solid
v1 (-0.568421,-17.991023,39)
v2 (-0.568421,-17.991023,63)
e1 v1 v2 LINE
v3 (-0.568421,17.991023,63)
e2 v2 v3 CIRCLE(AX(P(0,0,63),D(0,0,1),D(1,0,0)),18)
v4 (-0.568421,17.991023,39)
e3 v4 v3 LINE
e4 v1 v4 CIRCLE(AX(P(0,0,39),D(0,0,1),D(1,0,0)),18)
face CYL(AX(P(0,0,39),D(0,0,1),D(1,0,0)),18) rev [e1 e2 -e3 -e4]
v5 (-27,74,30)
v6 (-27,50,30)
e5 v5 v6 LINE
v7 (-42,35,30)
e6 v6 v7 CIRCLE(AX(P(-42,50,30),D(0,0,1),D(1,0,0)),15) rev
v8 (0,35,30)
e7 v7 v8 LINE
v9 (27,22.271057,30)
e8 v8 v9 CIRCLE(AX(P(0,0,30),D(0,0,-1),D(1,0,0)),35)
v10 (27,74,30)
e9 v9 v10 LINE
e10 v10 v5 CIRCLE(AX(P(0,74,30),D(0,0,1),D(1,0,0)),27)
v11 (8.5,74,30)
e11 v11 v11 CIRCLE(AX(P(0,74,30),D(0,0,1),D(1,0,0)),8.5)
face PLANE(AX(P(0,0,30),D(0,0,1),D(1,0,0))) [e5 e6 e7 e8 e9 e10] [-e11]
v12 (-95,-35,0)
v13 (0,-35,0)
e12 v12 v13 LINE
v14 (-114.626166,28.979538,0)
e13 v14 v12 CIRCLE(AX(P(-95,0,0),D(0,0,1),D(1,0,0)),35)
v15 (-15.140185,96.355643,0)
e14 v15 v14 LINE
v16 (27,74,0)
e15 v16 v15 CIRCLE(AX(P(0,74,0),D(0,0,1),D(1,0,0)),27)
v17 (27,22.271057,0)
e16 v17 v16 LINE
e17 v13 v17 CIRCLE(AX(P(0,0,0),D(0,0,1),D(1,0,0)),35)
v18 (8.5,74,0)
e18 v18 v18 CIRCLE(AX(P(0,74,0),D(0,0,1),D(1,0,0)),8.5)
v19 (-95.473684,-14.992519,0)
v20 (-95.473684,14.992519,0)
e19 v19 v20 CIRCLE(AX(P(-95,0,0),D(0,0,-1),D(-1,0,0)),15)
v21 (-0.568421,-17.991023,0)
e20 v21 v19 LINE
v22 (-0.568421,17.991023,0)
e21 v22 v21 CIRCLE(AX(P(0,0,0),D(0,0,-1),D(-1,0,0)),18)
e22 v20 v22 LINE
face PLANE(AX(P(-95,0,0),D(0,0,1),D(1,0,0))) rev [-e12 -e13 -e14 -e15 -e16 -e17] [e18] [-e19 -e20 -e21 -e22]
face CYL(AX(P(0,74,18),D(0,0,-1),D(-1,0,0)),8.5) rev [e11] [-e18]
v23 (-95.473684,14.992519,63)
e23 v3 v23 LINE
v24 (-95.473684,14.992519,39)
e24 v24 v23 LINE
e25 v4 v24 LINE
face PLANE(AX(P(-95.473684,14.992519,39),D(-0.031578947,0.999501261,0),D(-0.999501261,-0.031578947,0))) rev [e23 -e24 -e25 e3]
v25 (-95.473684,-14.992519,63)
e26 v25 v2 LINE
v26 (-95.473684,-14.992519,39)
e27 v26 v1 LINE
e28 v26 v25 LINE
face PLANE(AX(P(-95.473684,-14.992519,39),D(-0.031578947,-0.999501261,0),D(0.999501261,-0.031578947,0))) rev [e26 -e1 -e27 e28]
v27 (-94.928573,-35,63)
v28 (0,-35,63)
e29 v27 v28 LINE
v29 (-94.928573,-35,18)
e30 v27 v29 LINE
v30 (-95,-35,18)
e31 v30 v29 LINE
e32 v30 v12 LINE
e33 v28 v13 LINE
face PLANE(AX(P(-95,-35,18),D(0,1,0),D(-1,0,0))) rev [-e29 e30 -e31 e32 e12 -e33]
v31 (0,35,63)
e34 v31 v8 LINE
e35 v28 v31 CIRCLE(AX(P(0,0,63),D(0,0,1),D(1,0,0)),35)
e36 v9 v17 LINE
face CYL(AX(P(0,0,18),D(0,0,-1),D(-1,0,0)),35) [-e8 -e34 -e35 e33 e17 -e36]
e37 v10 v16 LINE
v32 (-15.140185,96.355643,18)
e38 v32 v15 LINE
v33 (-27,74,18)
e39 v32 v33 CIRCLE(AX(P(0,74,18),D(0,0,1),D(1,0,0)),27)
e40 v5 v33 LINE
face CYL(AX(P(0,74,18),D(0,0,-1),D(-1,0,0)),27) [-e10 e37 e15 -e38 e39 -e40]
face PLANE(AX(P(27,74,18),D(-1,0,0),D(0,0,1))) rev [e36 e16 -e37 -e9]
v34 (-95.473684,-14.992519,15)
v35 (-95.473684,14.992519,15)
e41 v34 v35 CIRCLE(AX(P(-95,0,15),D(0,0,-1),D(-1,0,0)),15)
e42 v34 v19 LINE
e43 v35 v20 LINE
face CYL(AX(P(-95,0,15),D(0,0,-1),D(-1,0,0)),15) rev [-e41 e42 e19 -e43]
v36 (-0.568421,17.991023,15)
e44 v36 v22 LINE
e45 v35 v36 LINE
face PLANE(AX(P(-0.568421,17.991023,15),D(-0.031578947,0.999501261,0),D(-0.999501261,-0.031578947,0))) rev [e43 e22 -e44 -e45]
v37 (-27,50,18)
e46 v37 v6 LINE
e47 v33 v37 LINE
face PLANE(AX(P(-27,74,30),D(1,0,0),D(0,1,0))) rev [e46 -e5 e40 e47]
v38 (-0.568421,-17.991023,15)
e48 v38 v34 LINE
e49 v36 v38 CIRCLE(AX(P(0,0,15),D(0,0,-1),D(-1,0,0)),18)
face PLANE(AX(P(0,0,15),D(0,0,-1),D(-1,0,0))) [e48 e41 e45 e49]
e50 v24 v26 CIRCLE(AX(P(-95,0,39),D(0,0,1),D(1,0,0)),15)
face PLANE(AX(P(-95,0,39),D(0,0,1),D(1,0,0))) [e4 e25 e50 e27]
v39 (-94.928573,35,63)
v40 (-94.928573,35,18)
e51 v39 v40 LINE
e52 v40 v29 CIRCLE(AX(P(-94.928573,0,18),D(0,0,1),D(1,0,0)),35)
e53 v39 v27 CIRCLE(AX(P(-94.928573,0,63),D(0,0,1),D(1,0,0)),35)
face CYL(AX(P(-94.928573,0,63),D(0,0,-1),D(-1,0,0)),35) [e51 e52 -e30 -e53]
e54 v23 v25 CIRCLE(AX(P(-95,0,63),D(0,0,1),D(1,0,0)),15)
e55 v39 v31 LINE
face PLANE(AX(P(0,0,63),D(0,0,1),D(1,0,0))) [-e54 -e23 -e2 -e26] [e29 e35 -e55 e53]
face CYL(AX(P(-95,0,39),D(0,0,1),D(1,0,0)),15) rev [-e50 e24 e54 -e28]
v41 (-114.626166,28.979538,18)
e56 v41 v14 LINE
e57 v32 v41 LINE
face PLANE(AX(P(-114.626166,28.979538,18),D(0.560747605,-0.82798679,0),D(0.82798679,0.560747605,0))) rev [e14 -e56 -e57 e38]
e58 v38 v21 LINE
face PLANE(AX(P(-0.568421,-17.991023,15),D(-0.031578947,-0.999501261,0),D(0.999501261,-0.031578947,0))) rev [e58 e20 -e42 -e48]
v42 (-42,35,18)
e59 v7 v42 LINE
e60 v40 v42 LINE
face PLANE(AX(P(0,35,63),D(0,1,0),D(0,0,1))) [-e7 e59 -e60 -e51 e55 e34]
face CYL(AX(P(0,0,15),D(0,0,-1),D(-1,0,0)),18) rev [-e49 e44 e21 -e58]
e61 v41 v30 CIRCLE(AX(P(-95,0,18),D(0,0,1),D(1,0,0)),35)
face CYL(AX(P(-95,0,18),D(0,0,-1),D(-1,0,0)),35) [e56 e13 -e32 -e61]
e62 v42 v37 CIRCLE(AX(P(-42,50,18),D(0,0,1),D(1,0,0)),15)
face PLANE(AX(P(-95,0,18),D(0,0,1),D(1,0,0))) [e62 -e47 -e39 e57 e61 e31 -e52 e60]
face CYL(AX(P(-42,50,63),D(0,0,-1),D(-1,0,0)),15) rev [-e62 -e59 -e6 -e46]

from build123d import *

# Parameters (mm, degrees)
SKETCH1_R           = 8.5
BASE_DEPTH          = 18
BACK_CUT_DEPTH      = 15
BOSS_EXTRUDE2_DEPTH = 45
SKETCH5_R           = 8.5
BOSS_EXTRUDE4_DEPTH = 12
FILLET1_R           = 15
CUT_EXTRUDE2_START  = -24
CUT_EXTRUDE2_DEPTH  = 24


# Read off the part's stored shape, not the designer's step: Boss-Extrude2
with BuildPart() as part:
    # Sketch1 → base (new body)
    with BuildSketch(Plane.XY):
        with BuildLine():
            Line((-95, -35), (0, -35))
            ThreePointArc((0, -35), (31.658229663, -14.925029132), (27, 22.271057451))
            Line((27, 22.271057451), (27, 74))
            ThreePointArc((27, 74), (12.653359163, 97.8514675), (-15.140185324, 96.355643322))
            Line((-15.140185324, 96.355643322), (-114.626166161, 28.97953764))
            ThreePointArc((-114.626166161, 28.97953764), (-128.461050621, -10.26440896), (-95, -35))
        make_face()
        with Locations((0, 74)):
            Circle(SKETCH1_R, mode=Mode.SUBTRACT)
    extrude(amount=BASE_DEPTH)

    # Sketch3 → back cut (cut)
    with BuildSketch(Plane(origin=(0, 0, 0), x_dir=(-1, 0, 0), z_dir=(0, 0, -1))):
        with BuildLine():
            Line((0.568421053, 17.991022692), (95.473684211, 14.99251891))
            ThreePointArc((95.473684211, 14.99251891), (110, 0), (95.473684211, -14.99251891))
            Line((95.473684211, -14.99251891), (0.568421053, -17.991022692))
            ThreePointArc((0.568421053, -17.991022692), (-18, 0), (0.568421053, 17.991022692))
        make_face()
    extrude(amount=-BACK_CUT_DEPTH, mode=Mode.SUBTRACT)

    # Boss-Extrude2 outline → Boss-Extrude2 (add)
    with BuildSketch(Plane.XY.offset(18)):
        with BuildLine():
            Line((-94.999999851, -34.999927116), (0, -35))
            ThreePointArc((0, -35), (35, 0), (0, 35))
            Line((0, 35), (-94.928572613, 35))
            ThreePointArc((-94.928572613, 35), (-129.928554392, 0.035713638), (-94.999999851, -34.999927116))
        make_face()
    extrude(amount=BOSS_EXTRUDE2_DEPTH)

    # Sketch5 → Boss-Extrude4 (add)
    with BuildSketch(Plane.XY.offset(18)):
        with BuildLine():
            Line((-27, 74), (-27, 35))
            Line((-27, 35), (0, 35))
            ThreePointArc((0, 35), (14.925029132, 31.658229663), (27, 22.271057451))
            Line((27, 22.271057451), (27, 74))
            ThreePointArc((27, 74), (0, 101), (-27, 74))
        make_face()
        with Locations((0, 74)):
            Circle(SKETCH5_R, mode=Mode.SUBTRACT)
    extrude(amount=BOSS_EXTRUDE4_DEPTH)

    # Fillet1
    fillet1_edges = [part.edges().sort_by_distance(p)[0] for p in [
        (-27, 35, 24),
    ]]
    fillet(fillet1_edges, radius=FILLET1_R)

    # Sketch6 → Cut-Extrude2 (cut)
    with BuildSketch(Plane.XY.offset(63).offset(CUT_EXTRUDE2_START)):
        with BuildLine():
            Line((-95.473684211, 14.99251891), (-0.568421053, 17.991022692))
            ThreePointArc((-0.568421053, 17.991022692), (18, 0), (-0.568421053, -17.991022692))
            Line((-0.568421053, -17.991022692), (-95.473684211, -14.99251891))
            ThreePointArc((-95.473684211, -14.99251891), (-110, 0), (-95.473684211, 14.99251891))
        make_face()
    extrude(amount=CUT_EXTRUDE2_DEPTH, mode=Mode.SUBTRACT)


solid = part.part
